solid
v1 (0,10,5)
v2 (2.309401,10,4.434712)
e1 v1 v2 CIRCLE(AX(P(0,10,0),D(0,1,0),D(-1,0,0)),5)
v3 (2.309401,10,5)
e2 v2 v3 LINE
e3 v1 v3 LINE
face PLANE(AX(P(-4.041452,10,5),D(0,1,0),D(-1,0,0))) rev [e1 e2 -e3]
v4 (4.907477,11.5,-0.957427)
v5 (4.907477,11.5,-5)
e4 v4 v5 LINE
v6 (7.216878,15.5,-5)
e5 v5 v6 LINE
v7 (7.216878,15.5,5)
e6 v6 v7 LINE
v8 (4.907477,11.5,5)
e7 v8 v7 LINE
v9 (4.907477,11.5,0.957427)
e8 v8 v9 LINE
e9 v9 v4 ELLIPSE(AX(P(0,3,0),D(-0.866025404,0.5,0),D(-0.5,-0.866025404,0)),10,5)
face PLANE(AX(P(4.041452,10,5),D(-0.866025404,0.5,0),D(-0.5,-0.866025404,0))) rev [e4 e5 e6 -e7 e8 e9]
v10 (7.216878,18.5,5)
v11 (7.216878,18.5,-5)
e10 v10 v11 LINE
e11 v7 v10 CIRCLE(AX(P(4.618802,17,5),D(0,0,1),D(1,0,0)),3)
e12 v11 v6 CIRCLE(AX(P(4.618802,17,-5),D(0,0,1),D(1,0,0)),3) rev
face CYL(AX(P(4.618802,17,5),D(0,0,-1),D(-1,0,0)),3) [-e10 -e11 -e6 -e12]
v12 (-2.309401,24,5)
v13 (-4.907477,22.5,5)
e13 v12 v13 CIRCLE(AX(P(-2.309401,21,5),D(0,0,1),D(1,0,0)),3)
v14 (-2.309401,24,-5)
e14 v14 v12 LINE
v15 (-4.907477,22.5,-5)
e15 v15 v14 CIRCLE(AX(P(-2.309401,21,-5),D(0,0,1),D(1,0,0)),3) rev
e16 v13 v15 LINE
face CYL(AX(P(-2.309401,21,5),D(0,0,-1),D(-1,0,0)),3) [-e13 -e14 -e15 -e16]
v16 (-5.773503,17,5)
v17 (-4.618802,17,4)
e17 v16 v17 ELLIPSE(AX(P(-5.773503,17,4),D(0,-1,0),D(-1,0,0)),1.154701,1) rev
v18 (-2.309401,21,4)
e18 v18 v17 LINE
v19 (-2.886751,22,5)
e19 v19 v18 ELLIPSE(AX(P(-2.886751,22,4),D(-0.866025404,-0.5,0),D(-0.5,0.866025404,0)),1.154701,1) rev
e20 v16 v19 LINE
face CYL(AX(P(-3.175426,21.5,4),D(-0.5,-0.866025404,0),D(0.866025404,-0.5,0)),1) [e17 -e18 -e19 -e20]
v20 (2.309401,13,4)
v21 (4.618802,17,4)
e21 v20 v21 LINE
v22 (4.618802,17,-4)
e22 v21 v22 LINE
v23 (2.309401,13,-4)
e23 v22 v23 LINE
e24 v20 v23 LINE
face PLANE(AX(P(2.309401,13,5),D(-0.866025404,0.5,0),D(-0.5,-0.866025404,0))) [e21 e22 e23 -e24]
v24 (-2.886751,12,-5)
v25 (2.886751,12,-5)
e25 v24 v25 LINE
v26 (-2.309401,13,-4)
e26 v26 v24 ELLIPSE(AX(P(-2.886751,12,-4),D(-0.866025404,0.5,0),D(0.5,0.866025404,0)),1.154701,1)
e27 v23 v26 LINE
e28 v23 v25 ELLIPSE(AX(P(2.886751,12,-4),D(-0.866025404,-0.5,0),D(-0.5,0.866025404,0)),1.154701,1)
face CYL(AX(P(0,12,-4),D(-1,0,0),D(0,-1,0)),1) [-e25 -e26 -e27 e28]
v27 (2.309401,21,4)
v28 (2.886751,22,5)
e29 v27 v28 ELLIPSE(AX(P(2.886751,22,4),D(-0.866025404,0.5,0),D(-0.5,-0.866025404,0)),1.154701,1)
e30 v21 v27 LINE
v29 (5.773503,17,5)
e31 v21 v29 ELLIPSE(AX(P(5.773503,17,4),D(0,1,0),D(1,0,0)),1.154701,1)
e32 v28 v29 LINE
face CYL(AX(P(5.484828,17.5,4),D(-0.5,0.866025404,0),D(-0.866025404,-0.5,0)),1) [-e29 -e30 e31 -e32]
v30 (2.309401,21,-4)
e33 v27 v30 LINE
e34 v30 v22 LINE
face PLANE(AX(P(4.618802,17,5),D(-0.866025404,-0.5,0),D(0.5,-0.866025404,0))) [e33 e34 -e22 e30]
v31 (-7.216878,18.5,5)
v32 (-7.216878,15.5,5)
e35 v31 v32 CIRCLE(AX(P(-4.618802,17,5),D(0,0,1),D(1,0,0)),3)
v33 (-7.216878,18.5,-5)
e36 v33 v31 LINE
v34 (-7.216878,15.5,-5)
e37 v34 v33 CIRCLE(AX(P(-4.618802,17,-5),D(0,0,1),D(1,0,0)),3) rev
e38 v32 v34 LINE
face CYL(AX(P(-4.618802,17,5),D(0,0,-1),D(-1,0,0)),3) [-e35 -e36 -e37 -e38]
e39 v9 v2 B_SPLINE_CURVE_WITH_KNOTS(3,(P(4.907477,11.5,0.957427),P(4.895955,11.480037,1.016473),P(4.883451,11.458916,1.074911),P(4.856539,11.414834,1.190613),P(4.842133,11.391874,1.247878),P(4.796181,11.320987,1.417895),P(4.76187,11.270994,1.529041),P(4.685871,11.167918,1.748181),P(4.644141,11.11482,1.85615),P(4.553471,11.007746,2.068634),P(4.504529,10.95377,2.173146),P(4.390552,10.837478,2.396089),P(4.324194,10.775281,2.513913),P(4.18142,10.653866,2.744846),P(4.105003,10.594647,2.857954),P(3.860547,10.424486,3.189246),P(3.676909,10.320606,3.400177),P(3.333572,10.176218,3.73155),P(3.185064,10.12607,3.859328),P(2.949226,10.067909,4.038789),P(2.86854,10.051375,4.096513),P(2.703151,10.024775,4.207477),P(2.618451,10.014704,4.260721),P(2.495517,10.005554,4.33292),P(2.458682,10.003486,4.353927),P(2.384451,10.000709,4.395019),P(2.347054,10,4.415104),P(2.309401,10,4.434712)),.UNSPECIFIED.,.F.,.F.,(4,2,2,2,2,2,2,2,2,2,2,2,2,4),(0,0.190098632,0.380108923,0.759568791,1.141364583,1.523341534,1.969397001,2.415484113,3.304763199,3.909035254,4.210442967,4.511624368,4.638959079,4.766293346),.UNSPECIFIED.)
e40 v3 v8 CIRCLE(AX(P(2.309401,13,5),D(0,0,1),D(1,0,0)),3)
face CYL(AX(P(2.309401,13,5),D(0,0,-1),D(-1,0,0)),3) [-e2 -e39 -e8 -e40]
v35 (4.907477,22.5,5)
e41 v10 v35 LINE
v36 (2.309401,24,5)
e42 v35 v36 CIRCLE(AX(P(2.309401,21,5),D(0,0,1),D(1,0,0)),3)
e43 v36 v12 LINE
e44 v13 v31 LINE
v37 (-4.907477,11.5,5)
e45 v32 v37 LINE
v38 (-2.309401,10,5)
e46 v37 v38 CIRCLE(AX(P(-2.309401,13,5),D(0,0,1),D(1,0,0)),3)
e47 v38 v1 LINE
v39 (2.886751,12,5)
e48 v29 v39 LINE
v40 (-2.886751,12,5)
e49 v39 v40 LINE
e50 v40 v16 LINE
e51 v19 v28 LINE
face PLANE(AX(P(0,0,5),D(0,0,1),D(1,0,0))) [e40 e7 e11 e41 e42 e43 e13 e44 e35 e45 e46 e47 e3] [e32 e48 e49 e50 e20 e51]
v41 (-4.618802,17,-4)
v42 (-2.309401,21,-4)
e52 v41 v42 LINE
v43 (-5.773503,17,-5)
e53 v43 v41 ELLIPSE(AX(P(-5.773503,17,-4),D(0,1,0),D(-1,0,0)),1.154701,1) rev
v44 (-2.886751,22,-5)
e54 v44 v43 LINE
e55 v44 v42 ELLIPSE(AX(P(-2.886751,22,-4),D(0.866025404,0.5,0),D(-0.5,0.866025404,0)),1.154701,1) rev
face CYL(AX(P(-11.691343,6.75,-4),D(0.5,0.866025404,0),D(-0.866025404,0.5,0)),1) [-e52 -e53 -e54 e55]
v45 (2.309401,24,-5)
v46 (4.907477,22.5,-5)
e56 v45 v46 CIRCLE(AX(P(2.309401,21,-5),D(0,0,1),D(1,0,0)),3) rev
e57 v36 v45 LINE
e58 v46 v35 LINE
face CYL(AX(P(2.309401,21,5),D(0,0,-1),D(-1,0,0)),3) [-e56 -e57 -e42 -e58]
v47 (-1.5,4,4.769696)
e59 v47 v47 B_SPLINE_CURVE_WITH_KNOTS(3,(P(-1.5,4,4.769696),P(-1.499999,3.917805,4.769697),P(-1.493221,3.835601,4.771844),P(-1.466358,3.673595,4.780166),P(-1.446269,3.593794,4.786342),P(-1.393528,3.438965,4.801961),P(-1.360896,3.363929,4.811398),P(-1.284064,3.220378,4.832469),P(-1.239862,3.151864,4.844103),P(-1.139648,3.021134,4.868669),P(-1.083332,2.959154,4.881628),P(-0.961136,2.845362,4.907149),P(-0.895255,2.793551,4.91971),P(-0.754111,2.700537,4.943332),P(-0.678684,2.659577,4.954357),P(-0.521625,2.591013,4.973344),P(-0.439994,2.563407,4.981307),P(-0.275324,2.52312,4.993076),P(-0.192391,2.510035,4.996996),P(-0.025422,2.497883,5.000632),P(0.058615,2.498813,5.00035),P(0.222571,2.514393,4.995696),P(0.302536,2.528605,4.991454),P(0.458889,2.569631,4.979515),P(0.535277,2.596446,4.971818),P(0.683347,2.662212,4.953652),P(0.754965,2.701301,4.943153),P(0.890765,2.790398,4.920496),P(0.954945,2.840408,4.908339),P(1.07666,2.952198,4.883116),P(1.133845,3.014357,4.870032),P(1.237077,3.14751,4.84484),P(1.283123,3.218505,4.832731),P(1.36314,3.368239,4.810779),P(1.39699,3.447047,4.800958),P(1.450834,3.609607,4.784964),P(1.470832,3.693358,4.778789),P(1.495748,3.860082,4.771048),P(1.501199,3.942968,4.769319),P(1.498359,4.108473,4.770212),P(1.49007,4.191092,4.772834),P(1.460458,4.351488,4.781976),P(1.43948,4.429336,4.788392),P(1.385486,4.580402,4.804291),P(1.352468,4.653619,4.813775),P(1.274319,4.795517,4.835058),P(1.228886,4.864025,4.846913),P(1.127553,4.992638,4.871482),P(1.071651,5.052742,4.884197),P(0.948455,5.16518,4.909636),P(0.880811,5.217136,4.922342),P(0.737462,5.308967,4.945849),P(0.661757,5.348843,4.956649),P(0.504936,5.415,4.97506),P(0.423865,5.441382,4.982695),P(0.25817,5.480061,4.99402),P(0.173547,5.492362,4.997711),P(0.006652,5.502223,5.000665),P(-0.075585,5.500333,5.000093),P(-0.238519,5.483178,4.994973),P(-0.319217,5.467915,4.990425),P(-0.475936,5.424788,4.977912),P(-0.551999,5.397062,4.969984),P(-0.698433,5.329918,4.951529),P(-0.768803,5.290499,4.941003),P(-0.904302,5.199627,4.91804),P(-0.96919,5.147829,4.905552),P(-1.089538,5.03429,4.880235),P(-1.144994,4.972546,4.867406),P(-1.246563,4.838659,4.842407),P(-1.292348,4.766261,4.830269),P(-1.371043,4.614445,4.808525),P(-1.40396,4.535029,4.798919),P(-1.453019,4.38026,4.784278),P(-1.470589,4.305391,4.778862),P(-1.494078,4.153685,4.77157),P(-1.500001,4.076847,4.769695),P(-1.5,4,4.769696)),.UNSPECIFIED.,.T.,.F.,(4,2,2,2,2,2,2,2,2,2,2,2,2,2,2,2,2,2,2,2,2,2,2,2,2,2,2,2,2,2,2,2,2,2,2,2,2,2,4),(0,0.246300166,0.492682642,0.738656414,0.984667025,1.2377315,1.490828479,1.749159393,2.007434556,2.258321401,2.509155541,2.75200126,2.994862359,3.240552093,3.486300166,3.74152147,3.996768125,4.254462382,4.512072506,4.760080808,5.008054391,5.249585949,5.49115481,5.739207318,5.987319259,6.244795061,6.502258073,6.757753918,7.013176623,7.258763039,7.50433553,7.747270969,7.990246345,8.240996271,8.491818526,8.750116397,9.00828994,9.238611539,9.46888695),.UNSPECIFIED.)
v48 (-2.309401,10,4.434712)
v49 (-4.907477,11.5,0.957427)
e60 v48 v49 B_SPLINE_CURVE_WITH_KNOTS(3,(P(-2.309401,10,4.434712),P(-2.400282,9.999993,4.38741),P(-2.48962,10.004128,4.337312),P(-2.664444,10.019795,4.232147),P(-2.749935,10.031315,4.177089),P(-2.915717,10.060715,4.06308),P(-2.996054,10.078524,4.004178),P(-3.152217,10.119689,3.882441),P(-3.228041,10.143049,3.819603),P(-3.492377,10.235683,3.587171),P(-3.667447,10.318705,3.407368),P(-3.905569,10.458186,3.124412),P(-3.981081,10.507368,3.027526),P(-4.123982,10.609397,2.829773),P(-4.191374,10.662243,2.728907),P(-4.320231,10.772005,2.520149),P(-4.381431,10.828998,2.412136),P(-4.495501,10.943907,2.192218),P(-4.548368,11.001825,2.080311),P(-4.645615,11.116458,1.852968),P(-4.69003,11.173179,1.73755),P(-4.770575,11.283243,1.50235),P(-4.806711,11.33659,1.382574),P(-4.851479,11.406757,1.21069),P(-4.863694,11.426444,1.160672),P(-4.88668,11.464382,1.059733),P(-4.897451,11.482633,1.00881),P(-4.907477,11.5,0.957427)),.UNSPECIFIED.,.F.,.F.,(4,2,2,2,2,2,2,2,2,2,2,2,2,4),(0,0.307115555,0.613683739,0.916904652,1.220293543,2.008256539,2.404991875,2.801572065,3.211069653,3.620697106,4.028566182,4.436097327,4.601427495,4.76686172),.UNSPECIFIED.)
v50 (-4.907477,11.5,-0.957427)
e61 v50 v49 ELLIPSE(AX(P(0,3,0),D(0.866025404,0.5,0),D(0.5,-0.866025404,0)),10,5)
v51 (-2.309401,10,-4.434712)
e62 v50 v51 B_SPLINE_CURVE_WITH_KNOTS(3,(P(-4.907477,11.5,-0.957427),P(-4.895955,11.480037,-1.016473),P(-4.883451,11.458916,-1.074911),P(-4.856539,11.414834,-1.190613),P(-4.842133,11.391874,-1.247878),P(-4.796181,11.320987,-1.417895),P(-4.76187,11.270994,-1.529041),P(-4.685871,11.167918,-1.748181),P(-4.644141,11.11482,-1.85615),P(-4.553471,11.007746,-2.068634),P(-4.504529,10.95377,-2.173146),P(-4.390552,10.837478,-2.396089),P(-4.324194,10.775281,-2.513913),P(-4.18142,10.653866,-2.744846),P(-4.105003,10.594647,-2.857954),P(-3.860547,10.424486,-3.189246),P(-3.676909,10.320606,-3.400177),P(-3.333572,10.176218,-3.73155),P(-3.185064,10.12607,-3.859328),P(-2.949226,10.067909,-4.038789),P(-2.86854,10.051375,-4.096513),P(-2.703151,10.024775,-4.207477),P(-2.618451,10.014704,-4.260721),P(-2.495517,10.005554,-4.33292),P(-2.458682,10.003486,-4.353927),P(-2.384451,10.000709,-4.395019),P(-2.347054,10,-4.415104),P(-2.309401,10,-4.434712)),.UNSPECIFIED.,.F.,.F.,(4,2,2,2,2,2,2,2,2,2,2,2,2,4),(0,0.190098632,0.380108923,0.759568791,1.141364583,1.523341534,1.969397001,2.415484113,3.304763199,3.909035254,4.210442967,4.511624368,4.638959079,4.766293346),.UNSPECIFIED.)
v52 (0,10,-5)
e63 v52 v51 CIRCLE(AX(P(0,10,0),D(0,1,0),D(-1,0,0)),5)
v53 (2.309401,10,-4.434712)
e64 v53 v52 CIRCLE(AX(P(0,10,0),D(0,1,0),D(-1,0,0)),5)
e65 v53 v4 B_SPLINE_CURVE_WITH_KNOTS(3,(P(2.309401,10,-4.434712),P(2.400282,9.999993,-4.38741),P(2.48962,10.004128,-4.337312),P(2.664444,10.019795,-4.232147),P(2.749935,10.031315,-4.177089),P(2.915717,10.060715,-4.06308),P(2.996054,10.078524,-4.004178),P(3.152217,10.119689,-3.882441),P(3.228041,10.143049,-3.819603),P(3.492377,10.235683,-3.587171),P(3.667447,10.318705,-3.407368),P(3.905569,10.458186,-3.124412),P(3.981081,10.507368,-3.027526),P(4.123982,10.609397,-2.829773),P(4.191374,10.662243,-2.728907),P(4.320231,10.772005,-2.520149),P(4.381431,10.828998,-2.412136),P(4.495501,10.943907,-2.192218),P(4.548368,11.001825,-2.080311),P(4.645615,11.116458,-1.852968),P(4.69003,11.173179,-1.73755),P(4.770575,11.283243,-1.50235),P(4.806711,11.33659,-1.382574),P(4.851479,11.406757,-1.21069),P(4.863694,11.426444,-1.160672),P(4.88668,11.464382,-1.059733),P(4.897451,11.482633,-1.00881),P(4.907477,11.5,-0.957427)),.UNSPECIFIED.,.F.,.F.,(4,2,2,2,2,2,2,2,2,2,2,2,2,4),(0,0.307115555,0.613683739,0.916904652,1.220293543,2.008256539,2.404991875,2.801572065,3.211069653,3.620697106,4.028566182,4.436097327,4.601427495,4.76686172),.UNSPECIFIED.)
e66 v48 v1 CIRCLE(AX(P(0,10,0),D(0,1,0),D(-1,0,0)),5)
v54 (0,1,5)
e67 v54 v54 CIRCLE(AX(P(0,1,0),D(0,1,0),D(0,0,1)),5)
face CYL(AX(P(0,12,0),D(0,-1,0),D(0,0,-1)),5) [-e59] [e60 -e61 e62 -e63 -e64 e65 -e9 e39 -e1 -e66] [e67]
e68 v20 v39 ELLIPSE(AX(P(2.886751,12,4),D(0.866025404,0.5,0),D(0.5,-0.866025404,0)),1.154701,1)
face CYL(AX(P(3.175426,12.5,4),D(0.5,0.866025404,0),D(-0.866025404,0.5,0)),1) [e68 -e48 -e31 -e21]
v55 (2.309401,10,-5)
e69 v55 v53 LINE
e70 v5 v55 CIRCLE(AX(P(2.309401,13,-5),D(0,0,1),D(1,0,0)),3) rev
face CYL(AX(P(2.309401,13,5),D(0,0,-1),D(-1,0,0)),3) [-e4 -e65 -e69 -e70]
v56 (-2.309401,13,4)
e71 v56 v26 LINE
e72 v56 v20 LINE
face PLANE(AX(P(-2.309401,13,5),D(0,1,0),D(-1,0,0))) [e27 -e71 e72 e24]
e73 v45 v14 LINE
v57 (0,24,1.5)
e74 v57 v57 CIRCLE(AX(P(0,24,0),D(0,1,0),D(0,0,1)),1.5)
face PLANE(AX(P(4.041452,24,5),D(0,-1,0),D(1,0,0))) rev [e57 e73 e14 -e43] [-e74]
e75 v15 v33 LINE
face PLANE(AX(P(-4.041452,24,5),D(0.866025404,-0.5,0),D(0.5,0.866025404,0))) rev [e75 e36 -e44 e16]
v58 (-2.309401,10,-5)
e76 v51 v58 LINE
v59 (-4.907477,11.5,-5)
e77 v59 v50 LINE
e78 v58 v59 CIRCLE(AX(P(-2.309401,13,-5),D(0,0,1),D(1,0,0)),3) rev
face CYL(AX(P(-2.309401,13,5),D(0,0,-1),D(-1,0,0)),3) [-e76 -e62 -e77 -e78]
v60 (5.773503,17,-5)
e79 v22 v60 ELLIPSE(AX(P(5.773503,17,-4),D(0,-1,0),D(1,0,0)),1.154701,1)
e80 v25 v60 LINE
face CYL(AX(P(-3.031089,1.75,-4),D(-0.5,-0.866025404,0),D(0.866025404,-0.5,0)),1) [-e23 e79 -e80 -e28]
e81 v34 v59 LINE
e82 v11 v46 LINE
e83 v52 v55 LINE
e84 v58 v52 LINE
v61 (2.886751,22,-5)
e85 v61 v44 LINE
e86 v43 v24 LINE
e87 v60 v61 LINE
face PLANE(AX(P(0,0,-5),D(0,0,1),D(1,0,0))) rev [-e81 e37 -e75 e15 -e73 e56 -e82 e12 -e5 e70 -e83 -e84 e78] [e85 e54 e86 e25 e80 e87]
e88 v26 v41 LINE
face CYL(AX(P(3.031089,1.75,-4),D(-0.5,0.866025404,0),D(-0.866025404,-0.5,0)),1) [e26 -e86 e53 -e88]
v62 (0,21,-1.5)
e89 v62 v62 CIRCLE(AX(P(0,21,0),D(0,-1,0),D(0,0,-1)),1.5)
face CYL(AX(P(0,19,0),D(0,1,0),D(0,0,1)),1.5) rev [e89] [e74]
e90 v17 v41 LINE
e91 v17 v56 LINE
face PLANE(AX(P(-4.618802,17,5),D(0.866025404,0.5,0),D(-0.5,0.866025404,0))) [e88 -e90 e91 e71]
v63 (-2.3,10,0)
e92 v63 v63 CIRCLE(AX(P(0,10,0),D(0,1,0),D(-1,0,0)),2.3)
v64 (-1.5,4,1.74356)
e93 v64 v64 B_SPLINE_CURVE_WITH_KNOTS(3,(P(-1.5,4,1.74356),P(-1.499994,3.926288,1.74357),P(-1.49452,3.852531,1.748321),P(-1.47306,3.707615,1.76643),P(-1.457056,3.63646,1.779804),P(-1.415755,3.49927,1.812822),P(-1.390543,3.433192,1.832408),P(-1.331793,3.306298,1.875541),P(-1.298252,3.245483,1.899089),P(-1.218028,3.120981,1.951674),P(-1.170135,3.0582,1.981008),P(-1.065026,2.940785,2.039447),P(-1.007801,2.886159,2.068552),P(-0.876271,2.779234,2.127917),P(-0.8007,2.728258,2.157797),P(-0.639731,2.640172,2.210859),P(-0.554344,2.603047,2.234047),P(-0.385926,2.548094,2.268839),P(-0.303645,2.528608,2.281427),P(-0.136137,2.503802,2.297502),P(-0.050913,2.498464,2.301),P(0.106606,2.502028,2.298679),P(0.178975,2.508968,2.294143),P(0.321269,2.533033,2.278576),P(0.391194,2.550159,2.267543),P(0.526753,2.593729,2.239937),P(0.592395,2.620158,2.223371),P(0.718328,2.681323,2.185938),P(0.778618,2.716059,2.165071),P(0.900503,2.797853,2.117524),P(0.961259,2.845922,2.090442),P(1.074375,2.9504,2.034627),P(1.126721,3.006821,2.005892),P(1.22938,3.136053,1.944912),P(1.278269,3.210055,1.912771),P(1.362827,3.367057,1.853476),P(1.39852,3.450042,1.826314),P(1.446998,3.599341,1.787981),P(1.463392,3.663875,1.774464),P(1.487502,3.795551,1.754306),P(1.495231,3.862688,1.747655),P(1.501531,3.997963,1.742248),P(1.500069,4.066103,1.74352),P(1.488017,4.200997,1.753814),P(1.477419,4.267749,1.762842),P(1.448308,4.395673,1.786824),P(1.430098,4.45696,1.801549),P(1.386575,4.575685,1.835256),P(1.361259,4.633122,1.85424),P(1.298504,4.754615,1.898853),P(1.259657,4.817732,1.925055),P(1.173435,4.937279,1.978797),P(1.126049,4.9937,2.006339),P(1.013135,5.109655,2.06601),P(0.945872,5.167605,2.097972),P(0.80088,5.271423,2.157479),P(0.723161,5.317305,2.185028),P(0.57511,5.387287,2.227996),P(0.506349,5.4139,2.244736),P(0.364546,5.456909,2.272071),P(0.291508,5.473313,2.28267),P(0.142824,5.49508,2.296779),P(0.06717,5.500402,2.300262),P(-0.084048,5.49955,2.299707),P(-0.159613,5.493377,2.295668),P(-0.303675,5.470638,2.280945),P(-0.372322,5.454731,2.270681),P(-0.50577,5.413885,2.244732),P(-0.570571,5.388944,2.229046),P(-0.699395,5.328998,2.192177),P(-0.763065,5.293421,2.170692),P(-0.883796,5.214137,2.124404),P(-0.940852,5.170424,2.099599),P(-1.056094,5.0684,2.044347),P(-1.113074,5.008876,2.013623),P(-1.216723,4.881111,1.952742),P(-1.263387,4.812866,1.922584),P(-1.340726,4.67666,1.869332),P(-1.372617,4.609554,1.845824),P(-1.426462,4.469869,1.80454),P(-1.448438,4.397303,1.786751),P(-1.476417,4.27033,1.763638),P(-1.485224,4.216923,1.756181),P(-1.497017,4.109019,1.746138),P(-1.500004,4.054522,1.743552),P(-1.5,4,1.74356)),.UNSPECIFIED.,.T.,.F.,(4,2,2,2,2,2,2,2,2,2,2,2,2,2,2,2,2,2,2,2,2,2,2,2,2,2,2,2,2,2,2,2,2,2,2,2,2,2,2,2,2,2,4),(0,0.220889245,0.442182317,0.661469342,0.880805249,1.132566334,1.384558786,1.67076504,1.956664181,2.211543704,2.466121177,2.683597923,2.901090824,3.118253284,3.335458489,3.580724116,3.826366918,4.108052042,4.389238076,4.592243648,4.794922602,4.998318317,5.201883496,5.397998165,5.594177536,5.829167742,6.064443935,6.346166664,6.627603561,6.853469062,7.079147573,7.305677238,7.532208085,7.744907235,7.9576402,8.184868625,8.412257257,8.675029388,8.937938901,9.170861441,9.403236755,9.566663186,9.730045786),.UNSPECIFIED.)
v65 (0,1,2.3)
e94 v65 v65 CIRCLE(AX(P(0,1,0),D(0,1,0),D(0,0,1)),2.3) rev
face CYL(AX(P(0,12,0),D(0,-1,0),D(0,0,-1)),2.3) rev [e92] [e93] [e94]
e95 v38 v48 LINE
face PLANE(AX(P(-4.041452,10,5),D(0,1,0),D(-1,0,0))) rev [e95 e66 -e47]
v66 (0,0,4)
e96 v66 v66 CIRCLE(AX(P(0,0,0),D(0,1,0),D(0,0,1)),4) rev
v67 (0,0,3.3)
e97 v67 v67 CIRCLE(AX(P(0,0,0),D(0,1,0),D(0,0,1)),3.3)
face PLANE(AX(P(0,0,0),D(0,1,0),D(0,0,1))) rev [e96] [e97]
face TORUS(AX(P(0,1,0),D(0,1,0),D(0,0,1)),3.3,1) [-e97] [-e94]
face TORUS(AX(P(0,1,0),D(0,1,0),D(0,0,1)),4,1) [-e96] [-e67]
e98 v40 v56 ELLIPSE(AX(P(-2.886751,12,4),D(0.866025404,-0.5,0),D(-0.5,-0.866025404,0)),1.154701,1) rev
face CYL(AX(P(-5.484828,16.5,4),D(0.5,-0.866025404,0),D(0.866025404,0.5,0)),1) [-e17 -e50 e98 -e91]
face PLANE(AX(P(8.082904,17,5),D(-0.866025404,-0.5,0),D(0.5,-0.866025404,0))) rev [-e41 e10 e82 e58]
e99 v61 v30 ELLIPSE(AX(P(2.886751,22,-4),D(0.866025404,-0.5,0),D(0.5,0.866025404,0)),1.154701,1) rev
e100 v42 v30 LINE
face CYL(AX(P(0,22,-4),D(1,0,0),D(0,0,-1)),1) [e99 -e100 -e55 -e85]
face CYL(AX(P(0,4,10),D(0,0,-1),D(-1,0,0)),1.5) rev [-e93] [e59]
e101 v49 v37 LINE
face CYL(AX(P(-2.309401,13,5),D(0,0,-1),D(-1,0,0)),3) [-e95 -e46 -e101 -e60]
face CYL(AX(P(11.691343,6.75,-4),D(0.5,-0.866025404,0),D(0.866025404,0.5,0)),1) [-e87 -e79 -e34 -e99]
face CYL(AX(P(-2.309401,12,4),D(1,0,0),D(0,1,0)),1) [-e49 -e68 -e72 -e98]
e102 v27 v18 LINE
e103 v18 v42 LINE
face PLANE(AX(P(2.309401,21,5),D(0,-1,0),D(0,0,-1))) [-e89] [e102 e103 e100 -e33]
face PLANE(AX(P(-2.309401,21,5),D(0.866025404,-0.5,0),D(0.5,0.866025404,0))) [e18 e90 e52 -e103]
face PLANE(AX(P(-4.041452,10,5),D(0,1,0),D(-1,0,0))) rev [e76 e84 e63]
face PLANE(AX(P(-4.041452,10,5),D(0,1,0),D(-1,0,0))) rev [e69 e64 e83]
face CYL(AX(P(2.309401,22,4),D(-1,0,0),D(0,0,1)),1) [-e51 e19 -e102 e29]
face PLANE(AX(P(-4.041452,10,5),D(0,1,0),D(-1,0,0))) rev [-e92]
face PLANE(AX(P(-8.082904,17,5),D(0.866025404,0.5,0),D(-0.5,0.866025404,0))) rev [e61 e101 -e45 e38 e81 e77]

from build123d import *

# Parameters (mm, degrees)
ESBO_O1_R                = 5
ESBO_O1_R_2              = 2.3
RESSALTO_EXTRUS_O1_DEPTH = 12
ESBO_O2_R                = 1.5
CORTE_EXTRUS_O1_DEPTH    = 10
RESSALTO_EXTRUS_O2_DEPTH = 5
ESBO_O4_R                = 1.5
CORTE_EXTRUS_O2_DEPTH    = 5
FILETE1_R                = 1
FILETE2_R                = 3


with BuildPart() as part:
    # Esboço1 → Ressalto-extrusão1 (new body)
    with BuildSketch(Plane(origin=(0, 0, 0), x_dir=(1, 0, 0), z_dir=(0, 1, 0))):
        with Locations(Location((0, 0, 0), (0, 0, 270))):
            Circle(ESBO_O1_R)
        with Locations(Location((0, 0, 0), (0, 0, 270))):
            Circle(ESBO_O1_R_2, mode=Mode.SUBTRACT)
    extrude(amount=RESSALTO_EXTRUS_O1_DEPTH)

    # Esboço2 → Corte-extrusão1 (cut)
    with BuildSketch(Plane.XY):
        with Locations(Location((0, 4, 0), (0, 0, 180))):
            Circle(ESBO_O2_R)
    extrude(amount=CORTE_EXTRUS_O1_DEPTH, mode=Mode.SUBTRACT)

    # Esboço3 → Ressalto-extrusão2 (add, symmetric)
    with BuildSketch(Plane.XY):
        Polygon((4.041451884, 10), (8.082903769, 17), (4.041451884, 24), (-4.041451884, 24), (-8.082903769, 17), (-4.041451884, 10), align=None)
        Polygon((2.309401077, 13), (4.618802154, 17), (2.309401077, 21), (-2.309401077, 21), (-4.618802154, 17), (-2.309401077, 13), align=None, mode=Mode.SUBTRACT)
    extrude(amount=RESSALTO_EXTRUS_O2_DEPTH, both=True)

    # Esboço4 → Corte-extrusão2 (cut)
    with BuildSketch(Plane(origin=(0, 24, 0), x_dir=(1, 0, 0), z_dir=(0, 1, 0))):
        with Locations(Location((0, 0, 0), (0, 0, 270))):
            Circle(ESBO_O4_R)
    extrude(amount=-CORTE_EXTRUS_O2_DEPTH, mode=Mode.SUBTRACT)

    # Filete1
    filete1_edges = [part.edges().sort_by_distance(p)[0] for p in [
        (0, 0, -5),
        (0, 13, -5),
        (3.464101615, 15, -5),
        (3.464101615, 19, -5),
        (0, 21, -5),
        (-3.464101615, 19, -5),
        (-3.464101615, 15, -5),
        (0, 13, 5),
        (3.464101615, 15, 5),
        (3.464101615, 19, 5),
        (0, 21, 5),
        (-3.464101615, 19, 5),
        (-3.464101615, 15, 5),
        (0, 0, -2.3),
    ]]
    fillet(filete1_edges, radius=FILETE1_R - 0.0001)  # a hair under: the kernel refuses the full size

    # Filete2
    filete2_edges = [part.edges().sort_by_distance(p)[0] for p in [
        (-4.041451884, 10, -3.971960144),
        (-4.041451884, 10, 3.971960144),
        (8.082903769, 17, 0),
        (4.041451884, 10, 3.971960144),
        (4.041451884, 10, -3.971960144),
        (4.041451884, 24, 0),
        (-4.041451884, 24, 0),
        (-8.082903769, 17, 0),
    ]]
    fillet(filete2_edges, radius=FILETE2_R)


solid = part.part
